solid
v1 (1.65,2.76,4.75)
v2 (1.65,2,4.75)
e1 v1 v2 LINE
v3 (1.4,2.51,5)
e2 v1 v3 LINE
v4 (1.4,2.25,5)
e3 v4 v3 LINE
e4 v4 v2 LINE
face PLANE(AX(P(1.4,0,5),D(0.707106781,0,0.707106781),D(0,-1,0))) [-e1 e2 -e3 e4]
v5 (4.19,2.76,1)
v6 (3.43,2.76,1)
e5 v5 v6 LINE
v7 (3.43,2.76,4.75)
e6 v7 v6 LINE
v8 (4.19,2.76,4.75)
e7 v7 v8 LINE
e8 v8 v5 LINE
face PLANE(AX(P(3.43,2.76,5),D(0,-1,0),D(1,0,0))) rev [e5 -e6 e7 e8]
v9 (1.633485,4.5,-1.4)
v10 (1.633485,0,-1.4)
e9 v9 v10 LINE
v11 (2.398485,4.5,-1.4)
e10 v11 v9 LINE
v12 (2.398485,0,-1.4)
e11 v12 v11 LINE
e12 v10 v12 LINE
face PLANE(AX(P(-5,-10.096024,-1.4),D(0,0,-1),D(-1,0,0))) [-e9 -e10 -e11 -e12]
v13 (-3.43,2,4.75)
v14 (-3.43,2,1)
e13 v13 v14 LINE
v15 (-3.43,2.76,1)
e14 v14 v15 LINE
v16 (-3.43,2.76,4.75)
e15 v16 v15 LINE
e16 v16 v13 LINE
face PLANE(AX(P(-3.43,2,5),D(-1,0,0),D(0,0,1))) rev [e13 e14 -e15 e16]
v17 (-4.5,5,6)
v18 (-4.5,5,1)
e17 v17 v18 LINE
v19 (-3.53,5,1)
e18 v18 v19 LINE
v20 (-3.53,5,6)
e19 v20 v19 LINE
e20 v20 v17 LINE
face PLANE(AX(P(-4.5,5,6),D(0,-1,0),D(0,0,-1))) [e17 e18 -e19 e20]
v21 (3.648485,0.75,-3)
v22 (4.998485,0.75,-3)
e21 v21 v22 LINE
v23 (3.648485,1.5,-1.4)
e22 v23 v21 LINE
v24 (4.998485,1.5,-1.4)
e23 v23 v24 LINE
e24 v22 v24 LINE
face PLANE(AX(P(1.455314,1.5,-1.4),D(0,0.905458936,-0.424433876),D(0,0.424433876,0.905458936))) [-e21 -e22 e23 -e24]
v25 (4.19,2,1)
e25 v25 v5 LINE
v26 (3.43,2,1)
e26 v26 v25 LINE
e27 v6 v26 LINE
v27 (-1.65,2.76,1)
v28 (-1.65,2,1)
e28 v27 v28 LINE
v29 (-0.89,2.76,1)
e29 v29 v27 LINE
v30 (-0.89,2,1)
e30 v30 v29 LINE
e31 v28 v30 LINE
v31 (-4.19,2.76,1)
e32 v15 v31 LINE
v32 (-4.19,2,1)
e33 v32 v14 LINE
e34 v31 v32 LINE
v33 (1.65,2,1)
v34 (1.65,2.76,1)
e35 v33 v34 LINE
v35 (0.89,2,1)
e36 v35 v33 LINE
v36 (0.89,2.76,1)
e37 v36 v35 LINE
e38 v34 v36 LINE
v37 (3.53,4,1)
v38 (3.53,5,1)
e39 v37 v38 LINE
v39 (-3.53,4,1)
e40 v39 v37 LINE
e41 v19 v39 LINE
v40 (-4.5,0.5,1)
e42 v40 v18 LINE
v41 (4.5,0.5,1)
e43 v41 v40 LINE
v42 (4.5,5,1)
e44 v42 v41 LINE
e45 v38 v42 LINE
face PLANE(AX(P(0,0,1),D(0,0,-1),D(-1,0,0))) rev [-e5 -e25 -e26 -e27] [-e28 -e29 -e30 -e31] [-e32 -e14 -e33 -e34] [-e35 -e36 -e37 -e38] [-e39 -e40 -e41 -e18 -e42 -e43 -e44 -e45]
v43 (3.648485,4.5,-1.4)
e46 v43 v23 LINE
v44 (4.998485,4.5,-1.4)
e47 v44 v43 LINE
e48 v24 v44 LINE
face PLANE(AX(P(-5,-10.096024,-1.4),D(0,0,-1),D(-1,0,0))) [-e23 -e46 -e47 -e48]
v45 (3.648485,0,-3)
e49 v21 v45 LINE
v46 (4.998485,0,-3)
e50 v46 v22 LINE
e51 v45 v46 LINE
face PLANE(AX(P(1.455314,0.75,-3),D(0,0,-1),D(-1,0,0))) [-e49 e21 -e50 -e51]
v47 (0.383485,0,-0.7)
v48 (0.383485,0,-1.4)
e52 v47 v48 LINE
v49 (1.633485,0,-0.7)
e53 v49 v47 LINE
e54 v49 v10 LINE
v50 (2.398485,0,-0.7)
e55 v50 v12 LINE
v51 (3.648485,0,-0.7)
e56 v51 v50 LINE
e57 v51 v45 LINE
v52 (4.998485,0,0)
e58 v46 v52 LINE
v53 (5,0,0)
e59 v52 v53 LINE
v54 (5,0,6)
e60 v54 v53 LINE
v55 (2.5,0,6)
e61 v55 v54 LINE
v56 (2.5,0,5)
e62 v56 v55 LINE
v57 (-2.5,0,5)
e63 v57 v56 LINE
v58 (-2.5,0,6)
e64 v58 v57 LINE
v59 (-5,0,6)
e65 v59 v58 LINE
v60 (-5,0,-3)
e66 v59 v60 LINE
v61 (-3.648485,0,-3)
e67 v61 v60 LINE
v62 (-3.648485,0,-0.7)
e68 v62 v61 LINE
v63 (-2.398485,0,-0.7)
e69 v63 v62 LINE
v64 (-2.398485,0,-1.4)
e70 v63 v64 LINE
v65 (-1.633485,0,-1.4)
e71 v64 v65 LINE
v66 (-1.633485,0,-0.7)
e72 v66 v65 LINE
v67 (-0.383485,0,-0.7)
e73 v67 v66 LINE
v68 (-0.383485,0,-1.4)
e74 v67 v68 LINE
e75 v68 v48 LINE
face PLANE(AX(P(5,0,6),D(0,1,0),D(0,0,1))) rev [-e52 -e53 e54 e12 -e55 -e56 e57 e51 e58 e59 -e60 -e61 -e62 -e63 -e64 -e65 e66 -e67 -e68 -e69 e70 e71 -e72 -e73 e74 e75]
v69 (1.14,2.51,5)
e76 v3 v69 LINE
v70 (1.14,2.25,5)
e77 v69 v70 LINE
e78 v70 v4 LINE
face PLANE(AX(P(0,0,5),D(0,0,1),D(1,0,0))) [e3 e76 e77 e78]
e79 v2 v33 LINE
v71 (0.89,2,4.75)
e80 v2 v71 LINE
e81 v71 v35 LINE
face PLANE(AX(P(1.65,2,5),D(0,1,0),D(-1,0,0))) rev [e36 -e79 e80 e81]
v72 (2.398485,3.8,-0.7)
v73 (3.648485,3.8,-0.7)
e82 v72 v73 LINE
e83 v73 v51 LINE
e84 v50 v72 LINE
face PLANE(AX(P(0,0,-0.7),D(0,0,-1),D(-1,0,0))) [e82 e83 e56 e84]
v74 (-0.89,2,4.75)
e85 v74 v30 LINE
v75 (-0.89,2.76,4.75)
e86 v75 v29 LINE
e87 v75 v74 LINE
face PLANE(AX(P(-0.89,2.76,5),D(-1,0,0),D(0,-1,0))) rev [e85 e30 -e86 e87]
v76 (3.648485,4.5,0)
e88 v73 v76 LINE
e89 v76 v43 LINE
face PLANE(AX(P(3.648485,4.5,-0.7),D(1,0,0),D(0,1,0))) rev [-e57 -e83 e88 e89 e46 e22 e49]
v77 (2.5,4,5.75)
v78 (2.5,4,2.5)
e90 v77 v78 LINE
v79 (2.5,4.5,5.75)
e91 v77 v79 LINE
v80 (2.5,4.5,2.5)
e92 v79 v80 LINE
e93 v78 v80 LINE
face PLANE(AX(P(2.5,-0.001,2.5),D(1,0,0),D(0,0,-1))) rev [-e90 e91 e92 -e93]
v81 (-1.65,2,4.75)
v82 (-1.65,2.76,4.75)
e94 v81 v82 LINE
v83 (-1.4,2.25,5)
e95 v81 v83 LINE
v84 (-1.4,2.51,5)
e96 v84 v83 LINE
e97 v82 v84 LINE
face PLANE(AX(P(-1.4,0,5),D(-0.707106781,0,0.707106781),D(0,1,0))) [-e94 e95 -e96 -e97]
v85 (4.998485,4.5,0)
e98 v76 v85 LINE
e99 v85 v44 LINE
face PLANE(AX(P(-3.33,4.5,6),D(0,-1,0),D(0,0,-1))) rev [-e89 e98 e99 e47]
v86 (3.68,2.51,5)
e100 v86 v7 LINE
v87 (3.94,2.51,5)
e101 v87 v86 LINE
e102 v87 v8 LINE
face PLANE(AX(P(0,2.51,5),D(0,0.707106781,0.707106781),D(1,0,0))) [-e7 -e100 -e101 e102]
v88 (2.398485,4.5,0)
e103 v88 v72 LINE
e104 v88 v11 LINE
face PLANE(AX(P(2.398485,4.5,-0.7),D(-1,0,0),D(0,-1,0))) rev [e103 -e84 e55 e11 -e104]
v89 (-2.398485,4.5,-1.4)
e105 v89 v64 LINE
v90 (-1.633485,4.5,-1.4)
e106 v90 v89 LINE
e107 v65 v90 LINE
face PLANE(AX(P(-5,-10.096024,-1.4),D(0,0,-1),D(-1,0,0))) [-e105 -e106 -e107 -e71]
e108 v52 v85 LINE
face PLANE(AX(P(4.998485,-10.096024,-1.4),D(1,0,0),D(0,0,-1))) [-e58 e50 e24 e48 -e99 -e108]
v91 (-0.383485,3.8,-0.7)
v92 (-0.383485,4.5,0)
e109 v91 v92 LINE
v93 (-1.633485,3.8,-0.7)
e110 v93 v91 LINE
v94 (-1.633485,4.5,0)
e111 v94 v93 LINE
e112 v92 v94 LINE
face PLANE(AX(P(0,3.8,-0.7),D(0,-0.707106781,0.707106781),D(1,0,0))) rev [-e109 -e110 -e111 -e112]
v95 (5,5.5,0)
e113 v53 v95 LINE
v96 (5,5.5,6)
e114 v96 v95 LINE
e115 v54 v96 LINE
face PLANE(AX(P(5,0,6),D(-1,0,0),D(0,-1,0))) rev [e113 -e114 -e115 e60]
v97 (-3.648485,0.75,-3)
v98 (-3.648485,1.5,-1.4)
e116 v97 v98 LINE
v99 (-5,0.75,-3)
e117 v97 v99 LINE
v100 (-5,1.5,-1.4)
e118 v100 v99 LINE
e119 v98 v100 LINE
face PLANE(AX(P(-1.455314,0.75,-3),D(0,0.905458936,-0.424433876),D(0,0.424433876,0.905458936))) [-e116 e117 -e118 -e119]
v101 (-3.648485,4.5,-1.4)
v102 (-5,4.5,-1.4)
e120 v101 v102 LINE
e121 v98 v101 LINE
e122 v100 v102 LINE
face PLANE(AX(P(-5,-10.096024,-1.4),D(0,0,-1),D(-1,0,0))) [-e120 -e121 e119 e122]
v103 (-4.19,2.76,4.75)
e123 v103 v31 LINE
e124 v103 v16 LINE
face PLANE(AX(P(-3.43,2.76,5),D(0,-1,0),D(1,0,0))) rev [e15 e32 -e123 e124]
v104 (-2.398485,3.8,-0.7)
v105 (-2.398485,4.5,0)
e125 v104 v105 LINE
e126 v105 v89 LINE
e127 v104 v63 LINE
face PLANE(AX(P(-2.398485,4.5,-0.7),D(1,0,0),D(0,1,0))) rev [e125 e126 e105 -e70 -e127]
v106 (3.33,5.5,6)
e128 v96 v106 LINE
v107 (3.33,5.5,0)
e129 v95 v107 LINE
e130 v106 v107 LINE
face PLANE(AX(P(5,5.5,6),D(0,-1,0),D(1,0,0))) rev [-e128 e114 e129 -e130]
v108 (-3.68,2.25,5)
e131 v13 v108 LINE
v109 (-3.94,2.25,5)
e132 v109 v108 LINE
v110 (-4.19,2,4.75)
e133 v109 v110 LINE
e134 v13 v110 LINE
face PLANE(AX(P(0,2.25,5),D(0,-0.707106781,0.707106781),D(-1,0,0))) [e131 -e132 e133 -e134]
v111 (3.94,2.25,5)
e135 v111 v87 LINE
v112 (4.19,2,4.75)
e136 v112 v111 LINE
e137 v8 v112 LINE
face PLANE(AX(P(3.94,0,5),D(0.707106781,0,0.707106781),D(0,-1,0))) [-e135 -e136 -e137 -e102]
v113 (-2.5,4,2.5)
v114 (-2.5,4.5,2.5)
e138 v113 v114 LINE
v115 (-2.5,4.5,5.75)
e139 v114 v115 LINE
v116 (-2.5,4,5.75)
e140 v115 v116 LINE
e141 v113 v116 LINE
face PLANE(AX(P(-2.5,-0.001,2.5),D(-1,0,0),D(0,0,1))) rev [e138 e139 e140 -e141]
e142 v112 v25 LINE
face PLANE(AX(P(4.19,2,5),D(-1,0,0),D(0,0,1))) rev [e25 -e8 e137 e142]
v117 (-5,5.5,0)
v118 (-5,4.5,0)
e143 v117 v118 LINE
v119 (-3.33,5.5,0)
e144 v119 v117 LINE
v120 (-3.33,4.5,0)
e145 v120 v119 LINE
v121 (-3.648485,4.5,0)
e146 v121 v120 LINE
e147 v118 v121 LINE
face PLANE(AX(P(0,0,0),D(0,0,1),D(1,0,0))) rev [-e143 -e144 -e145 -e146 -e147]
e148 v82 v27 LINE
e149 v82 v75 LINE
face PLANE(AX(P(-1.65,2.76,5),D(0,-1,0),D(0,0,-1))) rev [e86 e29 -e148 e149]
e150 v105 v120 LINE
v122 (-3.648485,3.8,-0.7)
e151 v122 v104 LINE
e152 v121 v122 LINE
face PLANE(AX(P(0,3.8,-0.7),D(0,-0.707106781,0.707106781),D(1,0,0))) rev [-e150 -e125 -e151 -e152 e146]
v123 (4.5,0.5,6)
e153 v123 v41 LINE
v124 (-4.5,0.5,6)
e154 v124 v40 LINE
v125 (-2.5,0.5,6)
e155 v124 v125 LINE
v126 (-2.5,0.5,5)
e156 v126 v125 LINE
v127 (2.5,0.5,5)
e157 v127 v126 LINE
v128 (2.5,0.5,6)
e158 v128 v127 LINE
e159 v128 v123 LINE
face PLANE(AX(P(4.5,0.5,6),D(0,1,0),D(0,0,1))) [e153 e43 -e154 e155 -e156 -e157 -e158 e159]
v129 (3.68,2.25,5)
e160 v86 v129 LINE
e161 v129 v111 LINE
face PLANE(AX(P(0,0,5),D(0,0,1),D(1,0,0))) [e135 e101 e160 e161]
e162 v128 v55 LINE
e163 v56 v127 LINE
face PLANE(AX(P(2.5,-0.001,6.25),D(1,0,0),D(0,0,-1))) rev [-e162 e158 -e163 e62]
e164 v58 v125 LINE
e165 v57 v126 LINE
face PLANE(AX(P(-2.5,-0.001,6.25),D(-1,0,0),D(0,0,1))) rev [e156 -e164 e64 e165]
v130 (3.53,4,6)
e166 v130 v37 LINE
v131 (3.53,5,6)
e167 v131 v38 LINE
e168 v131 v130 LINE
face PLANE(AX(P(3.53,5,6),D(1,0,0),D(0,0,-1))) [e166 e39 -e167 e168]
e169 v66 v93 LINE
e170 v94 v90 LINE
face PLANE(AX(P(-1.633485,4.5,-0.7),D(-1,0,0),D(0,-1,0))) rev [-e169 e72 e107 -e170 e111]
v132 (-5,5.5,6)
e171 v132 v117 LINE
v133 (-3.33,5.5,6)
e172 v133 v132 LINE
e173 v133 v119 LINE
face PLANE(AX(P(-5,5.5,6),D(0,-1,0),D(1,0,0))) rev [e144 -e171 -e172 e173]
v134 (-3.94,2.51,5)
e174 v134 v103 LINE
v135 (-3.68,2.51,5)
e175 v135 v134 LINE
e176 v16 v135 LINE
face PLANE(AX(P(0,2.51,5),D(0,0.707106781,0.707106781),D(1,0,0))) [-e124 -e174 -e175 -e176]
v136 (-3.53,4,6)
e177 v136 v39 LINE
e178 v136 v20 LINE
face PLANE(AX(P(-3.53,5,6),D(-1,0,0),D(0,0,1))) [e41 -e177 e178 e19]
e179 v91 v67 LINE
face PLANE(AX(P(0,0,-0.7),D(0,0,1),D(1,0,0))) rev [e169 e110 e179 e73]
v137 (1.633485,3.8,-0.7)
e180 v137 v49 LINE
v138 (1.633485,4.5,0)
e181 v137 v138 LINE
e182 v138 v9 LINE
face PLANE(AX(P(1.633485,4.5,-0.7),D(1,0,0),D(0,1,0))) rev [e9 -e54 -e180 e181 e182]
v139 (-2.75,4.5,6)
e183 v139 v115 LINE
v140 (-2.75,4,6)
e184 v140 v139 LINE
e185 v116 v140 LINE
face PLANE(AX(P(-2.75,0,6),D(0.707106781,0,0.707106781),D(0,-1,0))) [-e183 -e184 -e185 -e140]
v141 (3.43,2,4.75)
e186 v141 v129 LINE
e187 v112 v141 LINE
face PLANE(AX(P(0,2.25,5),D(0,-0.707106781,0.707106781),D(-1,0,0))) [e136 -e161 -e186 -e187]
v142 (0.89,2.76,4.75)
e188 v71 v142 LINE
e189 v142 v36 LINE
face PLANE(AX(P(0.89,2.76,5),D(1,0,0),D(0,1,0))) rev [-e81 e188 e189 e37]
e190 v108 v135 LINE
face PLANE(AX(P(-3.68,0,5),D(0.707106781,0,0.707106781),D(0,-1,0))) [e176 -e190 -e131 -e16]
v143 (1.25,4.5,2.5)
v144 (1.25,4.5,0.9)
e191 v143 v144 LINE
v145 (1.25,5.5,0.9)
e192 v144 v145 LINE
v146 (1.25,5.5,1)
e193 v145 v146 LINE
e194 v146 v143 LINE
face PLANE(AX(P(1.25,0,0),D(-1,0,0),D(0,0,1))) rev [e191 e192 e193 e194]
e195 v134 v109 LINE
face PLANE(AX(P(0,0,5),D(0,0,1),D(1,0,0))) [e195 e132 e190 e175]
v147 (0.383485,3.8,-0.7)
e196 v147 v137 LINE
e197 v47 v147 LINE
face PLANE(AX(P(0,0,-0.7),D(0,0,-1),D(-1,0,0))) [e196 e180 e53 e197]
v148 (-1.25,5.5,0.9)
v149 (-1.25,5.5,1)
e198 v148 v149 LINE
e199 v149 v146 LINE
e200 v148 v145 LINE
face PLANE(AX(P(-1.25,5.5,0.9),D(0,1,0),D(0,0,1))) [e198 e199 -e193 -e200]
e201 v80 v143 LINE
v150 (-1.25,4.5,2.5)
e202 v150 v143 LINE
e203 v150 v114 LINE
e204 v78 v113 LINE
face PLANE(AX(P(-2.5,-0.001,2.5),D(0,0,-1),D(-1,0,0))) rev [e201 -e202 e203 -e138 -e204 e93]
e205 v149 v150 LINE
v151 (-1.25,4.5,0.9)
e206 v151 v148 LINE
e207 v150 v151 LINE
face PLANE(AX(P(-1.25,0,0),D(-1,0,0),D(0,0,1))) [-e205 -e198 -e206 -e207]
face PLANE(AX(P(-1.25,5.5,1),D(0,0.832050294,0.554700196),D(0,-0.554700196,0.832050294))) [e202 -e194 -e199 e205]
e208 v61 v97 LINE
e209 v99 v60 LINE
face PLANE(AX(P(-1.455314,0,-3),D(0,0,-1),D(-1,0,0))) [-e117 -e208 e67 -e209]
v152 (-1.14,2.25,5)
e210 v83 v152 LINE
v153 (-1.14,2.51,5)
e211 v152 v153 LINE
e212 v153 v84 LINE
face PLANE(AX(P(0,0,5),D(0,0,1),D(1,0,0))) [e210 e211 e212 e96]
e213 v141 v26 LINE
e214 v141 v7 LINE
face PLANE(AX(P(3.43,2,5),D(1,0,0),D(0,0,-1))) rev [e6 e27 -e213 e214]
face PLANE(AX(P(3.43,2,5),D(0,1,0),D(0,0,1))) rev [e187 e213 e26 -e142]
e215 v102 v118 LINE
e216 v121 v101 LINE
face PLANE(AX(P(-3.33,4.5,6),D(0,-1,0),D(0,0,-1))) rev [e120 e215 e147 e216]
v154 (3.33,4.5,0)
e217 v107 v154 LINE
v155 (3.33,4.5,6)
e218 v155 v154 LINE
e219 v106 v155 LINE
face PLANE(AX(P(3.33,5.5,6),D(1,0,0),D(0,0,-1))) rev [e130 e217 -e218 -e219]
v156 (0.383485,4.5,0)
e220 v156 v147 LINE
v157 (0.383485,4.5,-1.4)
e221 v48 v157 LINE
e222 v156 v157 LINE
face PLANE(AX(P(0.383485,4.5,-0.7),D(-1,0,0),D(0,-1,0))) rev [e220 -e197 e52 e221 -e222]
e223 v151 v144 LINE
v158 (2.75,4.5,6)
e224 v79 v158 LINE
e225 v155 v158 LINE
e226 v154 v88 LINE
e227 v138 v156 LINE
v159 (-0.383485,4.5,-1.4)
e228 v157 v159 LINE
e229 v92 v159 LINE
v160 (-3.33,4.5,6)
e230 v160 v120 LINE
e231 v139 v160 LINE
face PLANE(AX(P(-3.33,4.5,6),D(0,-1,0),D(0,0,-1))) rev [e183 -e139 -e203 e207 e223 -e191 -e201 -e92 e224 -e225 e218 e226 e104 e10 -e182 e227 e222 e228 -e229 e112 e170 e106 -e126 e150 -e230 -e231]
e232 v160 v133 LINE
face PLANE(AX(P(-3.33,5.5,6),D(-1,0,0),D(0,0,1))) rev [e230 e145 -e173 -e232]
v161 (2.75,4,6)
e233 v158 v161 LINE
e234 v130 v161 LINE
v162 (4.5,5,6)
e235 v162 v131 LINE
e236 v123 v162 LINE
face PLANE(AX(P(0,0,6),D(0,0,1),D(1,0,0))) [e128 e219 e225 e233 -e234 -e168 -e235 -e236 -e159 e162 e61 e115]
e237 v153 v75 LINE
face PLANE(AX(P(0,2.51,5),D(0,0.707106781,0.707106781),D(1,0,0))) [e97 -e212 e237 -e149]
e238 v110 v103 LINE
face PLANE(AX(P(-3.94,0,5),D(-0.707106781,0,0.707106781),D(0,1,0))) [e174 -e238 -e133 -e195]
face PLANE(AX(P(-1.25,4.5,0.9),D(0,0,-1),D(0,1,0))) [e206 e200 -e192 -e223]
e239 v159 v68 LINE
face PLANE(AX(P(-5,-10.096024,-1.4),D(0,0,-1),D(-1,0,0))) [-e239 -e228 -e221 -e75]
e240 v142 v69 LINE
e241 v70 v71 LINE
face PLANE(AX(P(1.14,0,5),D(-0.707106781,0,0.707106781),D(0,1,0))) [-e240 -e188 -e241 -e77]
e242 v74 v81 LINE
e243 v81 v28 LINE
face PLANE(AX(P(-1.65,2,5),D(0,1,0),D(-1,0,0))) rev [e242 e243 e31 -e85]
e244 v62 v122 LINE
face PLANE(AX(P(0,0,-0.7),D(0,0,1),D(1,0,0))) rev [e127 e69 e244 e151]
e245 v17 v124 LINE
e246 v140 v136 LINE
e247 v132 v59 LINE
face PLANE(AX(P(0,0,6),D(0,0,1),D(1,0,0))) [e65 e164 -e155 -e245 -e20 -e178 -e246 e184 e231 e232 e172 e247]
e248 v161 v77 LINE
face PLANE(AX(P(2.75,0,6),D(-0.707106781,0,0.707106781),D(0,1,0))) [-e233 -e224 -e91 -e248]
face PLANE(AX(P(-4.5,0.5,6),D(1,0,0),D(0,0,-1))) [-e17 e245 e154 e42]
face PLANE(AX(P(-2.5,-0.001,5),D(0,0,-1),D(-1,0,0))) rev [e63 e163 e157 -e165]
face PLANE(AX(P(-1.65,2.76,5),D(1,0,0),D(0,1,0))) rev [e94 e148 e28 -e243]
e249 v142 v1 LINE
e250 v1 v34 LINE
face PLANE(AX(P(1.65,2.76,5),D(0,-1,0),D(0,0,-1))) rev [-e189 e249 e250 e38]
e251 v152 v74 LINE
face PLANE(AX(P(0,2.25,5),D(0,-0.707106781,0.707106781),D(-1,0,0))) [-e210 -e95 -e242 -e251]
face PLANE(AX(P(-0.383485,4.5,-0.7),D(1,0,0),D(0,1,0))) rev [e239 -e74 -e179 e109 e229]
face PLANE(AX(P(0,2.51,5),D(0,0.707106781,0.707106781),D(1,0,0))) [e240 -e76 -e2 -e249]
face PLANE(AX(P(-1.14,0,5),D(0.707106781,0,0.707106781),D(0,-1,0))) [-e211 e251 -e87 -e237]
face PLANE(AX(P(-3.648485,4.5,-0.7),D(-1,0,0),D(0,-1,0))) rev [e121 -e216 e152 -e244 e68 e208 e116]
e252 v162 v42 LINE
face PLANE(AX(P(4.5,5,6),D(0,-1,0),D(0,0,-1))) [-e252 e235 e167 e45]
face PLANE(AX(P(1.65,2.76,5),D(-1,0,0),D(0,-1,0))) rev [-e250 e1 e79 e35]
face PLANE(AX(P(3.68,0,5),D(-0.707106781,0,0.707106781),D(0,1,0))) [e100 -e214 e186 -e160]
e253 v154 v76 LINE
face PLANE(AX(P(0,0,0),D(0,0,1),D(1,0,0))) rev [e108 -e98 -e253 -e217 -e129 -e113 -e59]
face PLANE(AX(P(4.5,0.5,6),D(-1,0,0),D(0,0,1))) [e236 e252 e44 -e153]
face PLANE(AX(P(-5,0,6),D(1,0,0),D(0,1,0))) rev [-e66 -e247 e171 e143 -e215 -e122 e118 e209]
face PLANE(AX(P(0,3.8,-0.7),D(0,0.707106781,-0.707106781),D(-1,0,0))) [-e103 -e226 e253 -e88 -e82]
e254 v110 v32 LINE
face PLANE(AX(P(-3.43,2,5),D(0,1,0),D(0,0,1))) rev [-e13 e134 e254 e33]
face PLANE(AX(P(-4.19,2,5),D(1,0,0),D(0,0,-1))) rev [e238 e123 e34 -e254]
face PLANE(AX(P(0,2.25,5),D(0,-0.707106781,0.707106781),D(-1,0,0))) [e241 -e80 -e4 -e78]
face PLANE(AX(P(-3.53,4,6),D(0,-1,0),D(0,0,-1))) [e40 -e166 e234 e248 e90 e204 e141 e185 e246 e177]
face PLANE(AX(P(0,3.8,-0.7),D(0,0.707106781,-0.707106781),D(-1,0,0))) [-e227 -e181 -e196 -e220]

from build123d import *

# Parameters (mm, degrees)
BOSS_EXTRU_1_DEPTH      = 6
BOSS_EXTRU_2_DEPTH      = 1.25
BOSS_EXTRU_2_DEPTH_BACK = 1.25
BOSS_EXTRU_3_DEPTH      = 1
ESQUISSE4_W             = 9.998484941
ESQUISSE4_H             = 1.4
BOSS_EXTRU_4_DEPTH      = 4.5
ESQUISSE6_W             = 1.25
ESQUISSE6_H             = 4.5
ENL_V_MAT_EXTRU_1_DEPTH = 0.7
CHANFREIN1_SIZE         = 0.7
BOSS_EXTRU_5_DEPTH      = 1.351515059
BOSS_EXTRU_6_DEPTH      = 1.35
ESQUISSE9_W             = 0.76
ESQUISSE9_H             = 0.76
BOSS_EXTRU_7_DEPTH      = 4
CHANFREIN2_SIZE         = 0.25
ENL_V_MAT_EXTRU_2_REACH = 11.014
ESQUISSE10_W            = 5
ESQUISSE10_H            = 3.75
CHANFREIN3_SIZE         = 0.25
ENL_V_MAT_EXTRU_3_REACH = 11.274
ESQUISSE11_W            = 5
ESQUISSE11_H            = 1.25


with BuildPart() as part:
    # Esquisse1 → Boss.-Extru.1 (new body)
    with BuildSketch(Plane.XY):
        Polygon((5, 0), (-5, 0), (-5, 5.5), (-3.33, 5.5), (-3.33, 4.5), (3.33, 4.5), (3.33, 5.5), (5, 5.5), align=None)
        Polygon((-4.5, 5), (-3.53, 5), (-3.53, 4), (3.53, 4), (3.53, 5), (4.5, 5), (4.5, 0.5), (-4.5, 0.5), align=None, mode=Mode.SUBTRACT)
    extrude(amount=BOSS_EXTRU_1_DEPTH)

    # Esquisse2 → Boss.-Extru.2 (add, two sides: drawn at the far end of the back side and taken through both)
    with BuildSketch(Plane(origin=(0, 0, 0), x_dir=(0, 0, -1), z_dir=(1, 0, 0)).offset(-BOSS_EXTRU_2_DEPTH_BACK)):
        Polygon((-1, 5.5), (-2.5, 4.5), (-0.9, 4.5), (-0.9, 5.5), align=None)
    extrude(amount=BOSS_EXTRU_2_DEPTH + BOSS_EXTRU_2_DEPTH_BACK)

    # Esquisse3 → Boss.-Extru.3 (add)
    with BuildSketch(Plane(origin=(0, 0, 0), x_dir=(-1, 0, 0), z_dir=(0, 0, -1))):
        Polygon((-3.33, 5.5), (-5, 5.5), (-5, 0), (5, 0), (5, 5.5), (3.33, 5.5), (3.33, 4.5), (-3.33, 4.5), align=None)
    extrude(amount=-BOSS_EXTRU_3_DEPTH)

    # Esquisse4 → Boss.-Extru.4 (add)
    with BuildSketch(Plane(origin=(0, 4.5, 0), x_dir=(1, 0, 0), z_dir=(0, 1, 0))):
        with Locations((-0.000757529, 0.7)):
            Rectangle(ESQUISSE4_W, ESQUISSE4_H)
    extrude(amount=-BOSS_EXTRU_4_DEPTH)

    # Esquisse6 → Enlèv. mat.-Extru.1 (cut)
    with BuildSketch(Plane(origin=(0, 0, -1.4), x_dir=(-1, 0, 0), z_dir=(0, 0, -1))):
        with Locations((-3.023484941, 2.25)):
            Rectangle(ESQUISSE6_W, ESQUISSE6_H)
        with Locations((1.008484941, 2.25)):
            Rectangle(ESQUISSE6_W, ESQUISSE6_H)
        with Locations((-1.008484941, 2.25)):
            Rectangle(ESQUISSE6_W, ESQUISSE6_H)
        with Locations((3.023484941, 2.25)):
            Rectangle(ESQUISSE6_W, ESQUISSE6_H)
    extrude(amount=-ENL_V_MAT_EXTRU_1_DEPTH, mode=Mode.SUBTRACT)

    # Chanfrein1
    chanfrein1_edges = [part.edges().sort_by_distance(p)[0] for p in [
        (3.023484941, 4.5, -0.7),
        (1.008484941, 4.5, -0.7),
        (-1.008484941, 4.5, -0.7),
        (-3.023484941, 4.5, -0.7),
    ]]
    chamfer(chanfrein1_edges, length=CHANFREIN1_SIZE - 0.0001)  # a hair under: the kernel refuses the full size

    # Esquisse7 → Boss.-Extru.5 (add)
    with BuildSketch(Plane.ZY.offset(5)):
        Polygon((-1.4, 0), (-3, 0), (-3, 0.75), (-1.4, 1.5), align=None)
    extrude(amount=-BOSS_EXTRU_5_DEPTH)

    # Esquisse8 → Boss.-Extru.6 (add)
    with BuildSketch(Plane(origin=(4.998484941, 0, 0), x_dir=(0, 0, -1), z_dir=(1, 0, 0))):
        Polygon((1.4, 0), (3, 0), (3, 0.75), (1.4, 1.5), align=None)
    extrude(amount=-BOSS_EXTRU_6_DEPTH)

    # Esquisse9 → Boss.-Extru.7 (add)
    with BuildSketch(Plane.XY.offset(1)):
        with Locations((-1.27, 2.38)):
            Rectangle(ESQUISSE9_W, ESQUISSE9_H)
        with Locations((3.81, 2.38)):
            Rectangle(ESQUISSE9_W, ESQUISSE9_H)
        with Locations((-3.81, 2.38)):
            Rectangle(ESQUISSE9_W, ESQUISSE9_H)
        with Locations((1.27, 2.38)):
            Rectangle(ESQUISSE9_W, ESQUISSE9_H)
    extrude(amount=BOSS_EXTRU_7_DEPTH)

    # Chanfrein2
    chanfrein2_edges = [part.edges().sort_by_distance(p)[0] for p in [
        (-1.65, 2.38, 5),
        (-1.27, 2, 5),
        (-0.89, 2.38, 5),
        (-1.27, 2.76, 5),
        (-3.43, 2.38, 5),
        (-3.81, 2.76, 5),
        (-4.19, 2.38, 5),
        (-3.81, 2, 5),
        (3.81, 2, 5),
        (4.19, 2.38, 5),
        (3.81, 2.76, 5),
        (3.43, 2.38, 5),
        (1.27, 2.76, 5),
        (0.89, 2.38, 5),
        (1.27, 2, 5),
        (1.65, 2.38, 5),
    ]]
    chamfer(chanfrein2_edges, length=CHANFREIN2_SIZE)

    # Esquisse10 → Enlèv. mat.-Extru.2 (cut, up to next)
    with BuildSketch(Plane(origin=(0, 4.5, 0), x_dir=(1, 0, 0), z_dir=(0, 1, 0)), mode=Mode.PRIVATE) as enl_v_mat_extru_2_sk1:
        with Locations((0, -4.375)):
            Rectangle(ESQUISSE10_W, ESQUISSE10_H)
    enl_v_mat_extru_2_tool1 = extrude(enl_v_mat_extru_2_sk1.sketch, amount=-ENL_V_MAT_EXTRU_2_REACH, mode=Mode.PRIVATE) & part.part
    add(enl_v_mat_extru_2_tool1.solids().sort_by_distance((0, 4.5, 4.375))[0], mode=Mode.SUBTRACT)

    # Chanfrein3
    chanfrein3_edges = [part.edges().sort_by_distance(p)[0] for p in [
        (2.5, 4.25, 6),
        (-2.5, 4.25, 6),
    ]]
    chamfer(chanfrein3_edges, length=CHANFREIN3_SIZE)

    # Esquisse11 → Enlèv. mat.-Extru.3 (cut, up to next)
    with BuildSketch(Plane(origin=(0, 0.5, 0), x_dir=(1, 0, 0), z_dir=(0, 1, 0)), mode=Mode.PRIVATE) as enl_v_mat_extru_3_sk1:
        with Locations((0, -5.625)):
            Rectangle(ESQUISSE11_W, ESQUISSE11_H)
    enl_v_mat_extru_3_tool1 = extrude(enl_v_mat_extru_3_sk1.sketch, amount=-ENL_V_MAT_EXTRU_3_REACH, mode=Mode.PRIVATE) & part.part
    add(enl_v_mat_extru_3_tool1.solids().sort_by_distance((0, 0.5, 5.625))[0], mode=Mode.SUBTRACT)


solid = part.part
